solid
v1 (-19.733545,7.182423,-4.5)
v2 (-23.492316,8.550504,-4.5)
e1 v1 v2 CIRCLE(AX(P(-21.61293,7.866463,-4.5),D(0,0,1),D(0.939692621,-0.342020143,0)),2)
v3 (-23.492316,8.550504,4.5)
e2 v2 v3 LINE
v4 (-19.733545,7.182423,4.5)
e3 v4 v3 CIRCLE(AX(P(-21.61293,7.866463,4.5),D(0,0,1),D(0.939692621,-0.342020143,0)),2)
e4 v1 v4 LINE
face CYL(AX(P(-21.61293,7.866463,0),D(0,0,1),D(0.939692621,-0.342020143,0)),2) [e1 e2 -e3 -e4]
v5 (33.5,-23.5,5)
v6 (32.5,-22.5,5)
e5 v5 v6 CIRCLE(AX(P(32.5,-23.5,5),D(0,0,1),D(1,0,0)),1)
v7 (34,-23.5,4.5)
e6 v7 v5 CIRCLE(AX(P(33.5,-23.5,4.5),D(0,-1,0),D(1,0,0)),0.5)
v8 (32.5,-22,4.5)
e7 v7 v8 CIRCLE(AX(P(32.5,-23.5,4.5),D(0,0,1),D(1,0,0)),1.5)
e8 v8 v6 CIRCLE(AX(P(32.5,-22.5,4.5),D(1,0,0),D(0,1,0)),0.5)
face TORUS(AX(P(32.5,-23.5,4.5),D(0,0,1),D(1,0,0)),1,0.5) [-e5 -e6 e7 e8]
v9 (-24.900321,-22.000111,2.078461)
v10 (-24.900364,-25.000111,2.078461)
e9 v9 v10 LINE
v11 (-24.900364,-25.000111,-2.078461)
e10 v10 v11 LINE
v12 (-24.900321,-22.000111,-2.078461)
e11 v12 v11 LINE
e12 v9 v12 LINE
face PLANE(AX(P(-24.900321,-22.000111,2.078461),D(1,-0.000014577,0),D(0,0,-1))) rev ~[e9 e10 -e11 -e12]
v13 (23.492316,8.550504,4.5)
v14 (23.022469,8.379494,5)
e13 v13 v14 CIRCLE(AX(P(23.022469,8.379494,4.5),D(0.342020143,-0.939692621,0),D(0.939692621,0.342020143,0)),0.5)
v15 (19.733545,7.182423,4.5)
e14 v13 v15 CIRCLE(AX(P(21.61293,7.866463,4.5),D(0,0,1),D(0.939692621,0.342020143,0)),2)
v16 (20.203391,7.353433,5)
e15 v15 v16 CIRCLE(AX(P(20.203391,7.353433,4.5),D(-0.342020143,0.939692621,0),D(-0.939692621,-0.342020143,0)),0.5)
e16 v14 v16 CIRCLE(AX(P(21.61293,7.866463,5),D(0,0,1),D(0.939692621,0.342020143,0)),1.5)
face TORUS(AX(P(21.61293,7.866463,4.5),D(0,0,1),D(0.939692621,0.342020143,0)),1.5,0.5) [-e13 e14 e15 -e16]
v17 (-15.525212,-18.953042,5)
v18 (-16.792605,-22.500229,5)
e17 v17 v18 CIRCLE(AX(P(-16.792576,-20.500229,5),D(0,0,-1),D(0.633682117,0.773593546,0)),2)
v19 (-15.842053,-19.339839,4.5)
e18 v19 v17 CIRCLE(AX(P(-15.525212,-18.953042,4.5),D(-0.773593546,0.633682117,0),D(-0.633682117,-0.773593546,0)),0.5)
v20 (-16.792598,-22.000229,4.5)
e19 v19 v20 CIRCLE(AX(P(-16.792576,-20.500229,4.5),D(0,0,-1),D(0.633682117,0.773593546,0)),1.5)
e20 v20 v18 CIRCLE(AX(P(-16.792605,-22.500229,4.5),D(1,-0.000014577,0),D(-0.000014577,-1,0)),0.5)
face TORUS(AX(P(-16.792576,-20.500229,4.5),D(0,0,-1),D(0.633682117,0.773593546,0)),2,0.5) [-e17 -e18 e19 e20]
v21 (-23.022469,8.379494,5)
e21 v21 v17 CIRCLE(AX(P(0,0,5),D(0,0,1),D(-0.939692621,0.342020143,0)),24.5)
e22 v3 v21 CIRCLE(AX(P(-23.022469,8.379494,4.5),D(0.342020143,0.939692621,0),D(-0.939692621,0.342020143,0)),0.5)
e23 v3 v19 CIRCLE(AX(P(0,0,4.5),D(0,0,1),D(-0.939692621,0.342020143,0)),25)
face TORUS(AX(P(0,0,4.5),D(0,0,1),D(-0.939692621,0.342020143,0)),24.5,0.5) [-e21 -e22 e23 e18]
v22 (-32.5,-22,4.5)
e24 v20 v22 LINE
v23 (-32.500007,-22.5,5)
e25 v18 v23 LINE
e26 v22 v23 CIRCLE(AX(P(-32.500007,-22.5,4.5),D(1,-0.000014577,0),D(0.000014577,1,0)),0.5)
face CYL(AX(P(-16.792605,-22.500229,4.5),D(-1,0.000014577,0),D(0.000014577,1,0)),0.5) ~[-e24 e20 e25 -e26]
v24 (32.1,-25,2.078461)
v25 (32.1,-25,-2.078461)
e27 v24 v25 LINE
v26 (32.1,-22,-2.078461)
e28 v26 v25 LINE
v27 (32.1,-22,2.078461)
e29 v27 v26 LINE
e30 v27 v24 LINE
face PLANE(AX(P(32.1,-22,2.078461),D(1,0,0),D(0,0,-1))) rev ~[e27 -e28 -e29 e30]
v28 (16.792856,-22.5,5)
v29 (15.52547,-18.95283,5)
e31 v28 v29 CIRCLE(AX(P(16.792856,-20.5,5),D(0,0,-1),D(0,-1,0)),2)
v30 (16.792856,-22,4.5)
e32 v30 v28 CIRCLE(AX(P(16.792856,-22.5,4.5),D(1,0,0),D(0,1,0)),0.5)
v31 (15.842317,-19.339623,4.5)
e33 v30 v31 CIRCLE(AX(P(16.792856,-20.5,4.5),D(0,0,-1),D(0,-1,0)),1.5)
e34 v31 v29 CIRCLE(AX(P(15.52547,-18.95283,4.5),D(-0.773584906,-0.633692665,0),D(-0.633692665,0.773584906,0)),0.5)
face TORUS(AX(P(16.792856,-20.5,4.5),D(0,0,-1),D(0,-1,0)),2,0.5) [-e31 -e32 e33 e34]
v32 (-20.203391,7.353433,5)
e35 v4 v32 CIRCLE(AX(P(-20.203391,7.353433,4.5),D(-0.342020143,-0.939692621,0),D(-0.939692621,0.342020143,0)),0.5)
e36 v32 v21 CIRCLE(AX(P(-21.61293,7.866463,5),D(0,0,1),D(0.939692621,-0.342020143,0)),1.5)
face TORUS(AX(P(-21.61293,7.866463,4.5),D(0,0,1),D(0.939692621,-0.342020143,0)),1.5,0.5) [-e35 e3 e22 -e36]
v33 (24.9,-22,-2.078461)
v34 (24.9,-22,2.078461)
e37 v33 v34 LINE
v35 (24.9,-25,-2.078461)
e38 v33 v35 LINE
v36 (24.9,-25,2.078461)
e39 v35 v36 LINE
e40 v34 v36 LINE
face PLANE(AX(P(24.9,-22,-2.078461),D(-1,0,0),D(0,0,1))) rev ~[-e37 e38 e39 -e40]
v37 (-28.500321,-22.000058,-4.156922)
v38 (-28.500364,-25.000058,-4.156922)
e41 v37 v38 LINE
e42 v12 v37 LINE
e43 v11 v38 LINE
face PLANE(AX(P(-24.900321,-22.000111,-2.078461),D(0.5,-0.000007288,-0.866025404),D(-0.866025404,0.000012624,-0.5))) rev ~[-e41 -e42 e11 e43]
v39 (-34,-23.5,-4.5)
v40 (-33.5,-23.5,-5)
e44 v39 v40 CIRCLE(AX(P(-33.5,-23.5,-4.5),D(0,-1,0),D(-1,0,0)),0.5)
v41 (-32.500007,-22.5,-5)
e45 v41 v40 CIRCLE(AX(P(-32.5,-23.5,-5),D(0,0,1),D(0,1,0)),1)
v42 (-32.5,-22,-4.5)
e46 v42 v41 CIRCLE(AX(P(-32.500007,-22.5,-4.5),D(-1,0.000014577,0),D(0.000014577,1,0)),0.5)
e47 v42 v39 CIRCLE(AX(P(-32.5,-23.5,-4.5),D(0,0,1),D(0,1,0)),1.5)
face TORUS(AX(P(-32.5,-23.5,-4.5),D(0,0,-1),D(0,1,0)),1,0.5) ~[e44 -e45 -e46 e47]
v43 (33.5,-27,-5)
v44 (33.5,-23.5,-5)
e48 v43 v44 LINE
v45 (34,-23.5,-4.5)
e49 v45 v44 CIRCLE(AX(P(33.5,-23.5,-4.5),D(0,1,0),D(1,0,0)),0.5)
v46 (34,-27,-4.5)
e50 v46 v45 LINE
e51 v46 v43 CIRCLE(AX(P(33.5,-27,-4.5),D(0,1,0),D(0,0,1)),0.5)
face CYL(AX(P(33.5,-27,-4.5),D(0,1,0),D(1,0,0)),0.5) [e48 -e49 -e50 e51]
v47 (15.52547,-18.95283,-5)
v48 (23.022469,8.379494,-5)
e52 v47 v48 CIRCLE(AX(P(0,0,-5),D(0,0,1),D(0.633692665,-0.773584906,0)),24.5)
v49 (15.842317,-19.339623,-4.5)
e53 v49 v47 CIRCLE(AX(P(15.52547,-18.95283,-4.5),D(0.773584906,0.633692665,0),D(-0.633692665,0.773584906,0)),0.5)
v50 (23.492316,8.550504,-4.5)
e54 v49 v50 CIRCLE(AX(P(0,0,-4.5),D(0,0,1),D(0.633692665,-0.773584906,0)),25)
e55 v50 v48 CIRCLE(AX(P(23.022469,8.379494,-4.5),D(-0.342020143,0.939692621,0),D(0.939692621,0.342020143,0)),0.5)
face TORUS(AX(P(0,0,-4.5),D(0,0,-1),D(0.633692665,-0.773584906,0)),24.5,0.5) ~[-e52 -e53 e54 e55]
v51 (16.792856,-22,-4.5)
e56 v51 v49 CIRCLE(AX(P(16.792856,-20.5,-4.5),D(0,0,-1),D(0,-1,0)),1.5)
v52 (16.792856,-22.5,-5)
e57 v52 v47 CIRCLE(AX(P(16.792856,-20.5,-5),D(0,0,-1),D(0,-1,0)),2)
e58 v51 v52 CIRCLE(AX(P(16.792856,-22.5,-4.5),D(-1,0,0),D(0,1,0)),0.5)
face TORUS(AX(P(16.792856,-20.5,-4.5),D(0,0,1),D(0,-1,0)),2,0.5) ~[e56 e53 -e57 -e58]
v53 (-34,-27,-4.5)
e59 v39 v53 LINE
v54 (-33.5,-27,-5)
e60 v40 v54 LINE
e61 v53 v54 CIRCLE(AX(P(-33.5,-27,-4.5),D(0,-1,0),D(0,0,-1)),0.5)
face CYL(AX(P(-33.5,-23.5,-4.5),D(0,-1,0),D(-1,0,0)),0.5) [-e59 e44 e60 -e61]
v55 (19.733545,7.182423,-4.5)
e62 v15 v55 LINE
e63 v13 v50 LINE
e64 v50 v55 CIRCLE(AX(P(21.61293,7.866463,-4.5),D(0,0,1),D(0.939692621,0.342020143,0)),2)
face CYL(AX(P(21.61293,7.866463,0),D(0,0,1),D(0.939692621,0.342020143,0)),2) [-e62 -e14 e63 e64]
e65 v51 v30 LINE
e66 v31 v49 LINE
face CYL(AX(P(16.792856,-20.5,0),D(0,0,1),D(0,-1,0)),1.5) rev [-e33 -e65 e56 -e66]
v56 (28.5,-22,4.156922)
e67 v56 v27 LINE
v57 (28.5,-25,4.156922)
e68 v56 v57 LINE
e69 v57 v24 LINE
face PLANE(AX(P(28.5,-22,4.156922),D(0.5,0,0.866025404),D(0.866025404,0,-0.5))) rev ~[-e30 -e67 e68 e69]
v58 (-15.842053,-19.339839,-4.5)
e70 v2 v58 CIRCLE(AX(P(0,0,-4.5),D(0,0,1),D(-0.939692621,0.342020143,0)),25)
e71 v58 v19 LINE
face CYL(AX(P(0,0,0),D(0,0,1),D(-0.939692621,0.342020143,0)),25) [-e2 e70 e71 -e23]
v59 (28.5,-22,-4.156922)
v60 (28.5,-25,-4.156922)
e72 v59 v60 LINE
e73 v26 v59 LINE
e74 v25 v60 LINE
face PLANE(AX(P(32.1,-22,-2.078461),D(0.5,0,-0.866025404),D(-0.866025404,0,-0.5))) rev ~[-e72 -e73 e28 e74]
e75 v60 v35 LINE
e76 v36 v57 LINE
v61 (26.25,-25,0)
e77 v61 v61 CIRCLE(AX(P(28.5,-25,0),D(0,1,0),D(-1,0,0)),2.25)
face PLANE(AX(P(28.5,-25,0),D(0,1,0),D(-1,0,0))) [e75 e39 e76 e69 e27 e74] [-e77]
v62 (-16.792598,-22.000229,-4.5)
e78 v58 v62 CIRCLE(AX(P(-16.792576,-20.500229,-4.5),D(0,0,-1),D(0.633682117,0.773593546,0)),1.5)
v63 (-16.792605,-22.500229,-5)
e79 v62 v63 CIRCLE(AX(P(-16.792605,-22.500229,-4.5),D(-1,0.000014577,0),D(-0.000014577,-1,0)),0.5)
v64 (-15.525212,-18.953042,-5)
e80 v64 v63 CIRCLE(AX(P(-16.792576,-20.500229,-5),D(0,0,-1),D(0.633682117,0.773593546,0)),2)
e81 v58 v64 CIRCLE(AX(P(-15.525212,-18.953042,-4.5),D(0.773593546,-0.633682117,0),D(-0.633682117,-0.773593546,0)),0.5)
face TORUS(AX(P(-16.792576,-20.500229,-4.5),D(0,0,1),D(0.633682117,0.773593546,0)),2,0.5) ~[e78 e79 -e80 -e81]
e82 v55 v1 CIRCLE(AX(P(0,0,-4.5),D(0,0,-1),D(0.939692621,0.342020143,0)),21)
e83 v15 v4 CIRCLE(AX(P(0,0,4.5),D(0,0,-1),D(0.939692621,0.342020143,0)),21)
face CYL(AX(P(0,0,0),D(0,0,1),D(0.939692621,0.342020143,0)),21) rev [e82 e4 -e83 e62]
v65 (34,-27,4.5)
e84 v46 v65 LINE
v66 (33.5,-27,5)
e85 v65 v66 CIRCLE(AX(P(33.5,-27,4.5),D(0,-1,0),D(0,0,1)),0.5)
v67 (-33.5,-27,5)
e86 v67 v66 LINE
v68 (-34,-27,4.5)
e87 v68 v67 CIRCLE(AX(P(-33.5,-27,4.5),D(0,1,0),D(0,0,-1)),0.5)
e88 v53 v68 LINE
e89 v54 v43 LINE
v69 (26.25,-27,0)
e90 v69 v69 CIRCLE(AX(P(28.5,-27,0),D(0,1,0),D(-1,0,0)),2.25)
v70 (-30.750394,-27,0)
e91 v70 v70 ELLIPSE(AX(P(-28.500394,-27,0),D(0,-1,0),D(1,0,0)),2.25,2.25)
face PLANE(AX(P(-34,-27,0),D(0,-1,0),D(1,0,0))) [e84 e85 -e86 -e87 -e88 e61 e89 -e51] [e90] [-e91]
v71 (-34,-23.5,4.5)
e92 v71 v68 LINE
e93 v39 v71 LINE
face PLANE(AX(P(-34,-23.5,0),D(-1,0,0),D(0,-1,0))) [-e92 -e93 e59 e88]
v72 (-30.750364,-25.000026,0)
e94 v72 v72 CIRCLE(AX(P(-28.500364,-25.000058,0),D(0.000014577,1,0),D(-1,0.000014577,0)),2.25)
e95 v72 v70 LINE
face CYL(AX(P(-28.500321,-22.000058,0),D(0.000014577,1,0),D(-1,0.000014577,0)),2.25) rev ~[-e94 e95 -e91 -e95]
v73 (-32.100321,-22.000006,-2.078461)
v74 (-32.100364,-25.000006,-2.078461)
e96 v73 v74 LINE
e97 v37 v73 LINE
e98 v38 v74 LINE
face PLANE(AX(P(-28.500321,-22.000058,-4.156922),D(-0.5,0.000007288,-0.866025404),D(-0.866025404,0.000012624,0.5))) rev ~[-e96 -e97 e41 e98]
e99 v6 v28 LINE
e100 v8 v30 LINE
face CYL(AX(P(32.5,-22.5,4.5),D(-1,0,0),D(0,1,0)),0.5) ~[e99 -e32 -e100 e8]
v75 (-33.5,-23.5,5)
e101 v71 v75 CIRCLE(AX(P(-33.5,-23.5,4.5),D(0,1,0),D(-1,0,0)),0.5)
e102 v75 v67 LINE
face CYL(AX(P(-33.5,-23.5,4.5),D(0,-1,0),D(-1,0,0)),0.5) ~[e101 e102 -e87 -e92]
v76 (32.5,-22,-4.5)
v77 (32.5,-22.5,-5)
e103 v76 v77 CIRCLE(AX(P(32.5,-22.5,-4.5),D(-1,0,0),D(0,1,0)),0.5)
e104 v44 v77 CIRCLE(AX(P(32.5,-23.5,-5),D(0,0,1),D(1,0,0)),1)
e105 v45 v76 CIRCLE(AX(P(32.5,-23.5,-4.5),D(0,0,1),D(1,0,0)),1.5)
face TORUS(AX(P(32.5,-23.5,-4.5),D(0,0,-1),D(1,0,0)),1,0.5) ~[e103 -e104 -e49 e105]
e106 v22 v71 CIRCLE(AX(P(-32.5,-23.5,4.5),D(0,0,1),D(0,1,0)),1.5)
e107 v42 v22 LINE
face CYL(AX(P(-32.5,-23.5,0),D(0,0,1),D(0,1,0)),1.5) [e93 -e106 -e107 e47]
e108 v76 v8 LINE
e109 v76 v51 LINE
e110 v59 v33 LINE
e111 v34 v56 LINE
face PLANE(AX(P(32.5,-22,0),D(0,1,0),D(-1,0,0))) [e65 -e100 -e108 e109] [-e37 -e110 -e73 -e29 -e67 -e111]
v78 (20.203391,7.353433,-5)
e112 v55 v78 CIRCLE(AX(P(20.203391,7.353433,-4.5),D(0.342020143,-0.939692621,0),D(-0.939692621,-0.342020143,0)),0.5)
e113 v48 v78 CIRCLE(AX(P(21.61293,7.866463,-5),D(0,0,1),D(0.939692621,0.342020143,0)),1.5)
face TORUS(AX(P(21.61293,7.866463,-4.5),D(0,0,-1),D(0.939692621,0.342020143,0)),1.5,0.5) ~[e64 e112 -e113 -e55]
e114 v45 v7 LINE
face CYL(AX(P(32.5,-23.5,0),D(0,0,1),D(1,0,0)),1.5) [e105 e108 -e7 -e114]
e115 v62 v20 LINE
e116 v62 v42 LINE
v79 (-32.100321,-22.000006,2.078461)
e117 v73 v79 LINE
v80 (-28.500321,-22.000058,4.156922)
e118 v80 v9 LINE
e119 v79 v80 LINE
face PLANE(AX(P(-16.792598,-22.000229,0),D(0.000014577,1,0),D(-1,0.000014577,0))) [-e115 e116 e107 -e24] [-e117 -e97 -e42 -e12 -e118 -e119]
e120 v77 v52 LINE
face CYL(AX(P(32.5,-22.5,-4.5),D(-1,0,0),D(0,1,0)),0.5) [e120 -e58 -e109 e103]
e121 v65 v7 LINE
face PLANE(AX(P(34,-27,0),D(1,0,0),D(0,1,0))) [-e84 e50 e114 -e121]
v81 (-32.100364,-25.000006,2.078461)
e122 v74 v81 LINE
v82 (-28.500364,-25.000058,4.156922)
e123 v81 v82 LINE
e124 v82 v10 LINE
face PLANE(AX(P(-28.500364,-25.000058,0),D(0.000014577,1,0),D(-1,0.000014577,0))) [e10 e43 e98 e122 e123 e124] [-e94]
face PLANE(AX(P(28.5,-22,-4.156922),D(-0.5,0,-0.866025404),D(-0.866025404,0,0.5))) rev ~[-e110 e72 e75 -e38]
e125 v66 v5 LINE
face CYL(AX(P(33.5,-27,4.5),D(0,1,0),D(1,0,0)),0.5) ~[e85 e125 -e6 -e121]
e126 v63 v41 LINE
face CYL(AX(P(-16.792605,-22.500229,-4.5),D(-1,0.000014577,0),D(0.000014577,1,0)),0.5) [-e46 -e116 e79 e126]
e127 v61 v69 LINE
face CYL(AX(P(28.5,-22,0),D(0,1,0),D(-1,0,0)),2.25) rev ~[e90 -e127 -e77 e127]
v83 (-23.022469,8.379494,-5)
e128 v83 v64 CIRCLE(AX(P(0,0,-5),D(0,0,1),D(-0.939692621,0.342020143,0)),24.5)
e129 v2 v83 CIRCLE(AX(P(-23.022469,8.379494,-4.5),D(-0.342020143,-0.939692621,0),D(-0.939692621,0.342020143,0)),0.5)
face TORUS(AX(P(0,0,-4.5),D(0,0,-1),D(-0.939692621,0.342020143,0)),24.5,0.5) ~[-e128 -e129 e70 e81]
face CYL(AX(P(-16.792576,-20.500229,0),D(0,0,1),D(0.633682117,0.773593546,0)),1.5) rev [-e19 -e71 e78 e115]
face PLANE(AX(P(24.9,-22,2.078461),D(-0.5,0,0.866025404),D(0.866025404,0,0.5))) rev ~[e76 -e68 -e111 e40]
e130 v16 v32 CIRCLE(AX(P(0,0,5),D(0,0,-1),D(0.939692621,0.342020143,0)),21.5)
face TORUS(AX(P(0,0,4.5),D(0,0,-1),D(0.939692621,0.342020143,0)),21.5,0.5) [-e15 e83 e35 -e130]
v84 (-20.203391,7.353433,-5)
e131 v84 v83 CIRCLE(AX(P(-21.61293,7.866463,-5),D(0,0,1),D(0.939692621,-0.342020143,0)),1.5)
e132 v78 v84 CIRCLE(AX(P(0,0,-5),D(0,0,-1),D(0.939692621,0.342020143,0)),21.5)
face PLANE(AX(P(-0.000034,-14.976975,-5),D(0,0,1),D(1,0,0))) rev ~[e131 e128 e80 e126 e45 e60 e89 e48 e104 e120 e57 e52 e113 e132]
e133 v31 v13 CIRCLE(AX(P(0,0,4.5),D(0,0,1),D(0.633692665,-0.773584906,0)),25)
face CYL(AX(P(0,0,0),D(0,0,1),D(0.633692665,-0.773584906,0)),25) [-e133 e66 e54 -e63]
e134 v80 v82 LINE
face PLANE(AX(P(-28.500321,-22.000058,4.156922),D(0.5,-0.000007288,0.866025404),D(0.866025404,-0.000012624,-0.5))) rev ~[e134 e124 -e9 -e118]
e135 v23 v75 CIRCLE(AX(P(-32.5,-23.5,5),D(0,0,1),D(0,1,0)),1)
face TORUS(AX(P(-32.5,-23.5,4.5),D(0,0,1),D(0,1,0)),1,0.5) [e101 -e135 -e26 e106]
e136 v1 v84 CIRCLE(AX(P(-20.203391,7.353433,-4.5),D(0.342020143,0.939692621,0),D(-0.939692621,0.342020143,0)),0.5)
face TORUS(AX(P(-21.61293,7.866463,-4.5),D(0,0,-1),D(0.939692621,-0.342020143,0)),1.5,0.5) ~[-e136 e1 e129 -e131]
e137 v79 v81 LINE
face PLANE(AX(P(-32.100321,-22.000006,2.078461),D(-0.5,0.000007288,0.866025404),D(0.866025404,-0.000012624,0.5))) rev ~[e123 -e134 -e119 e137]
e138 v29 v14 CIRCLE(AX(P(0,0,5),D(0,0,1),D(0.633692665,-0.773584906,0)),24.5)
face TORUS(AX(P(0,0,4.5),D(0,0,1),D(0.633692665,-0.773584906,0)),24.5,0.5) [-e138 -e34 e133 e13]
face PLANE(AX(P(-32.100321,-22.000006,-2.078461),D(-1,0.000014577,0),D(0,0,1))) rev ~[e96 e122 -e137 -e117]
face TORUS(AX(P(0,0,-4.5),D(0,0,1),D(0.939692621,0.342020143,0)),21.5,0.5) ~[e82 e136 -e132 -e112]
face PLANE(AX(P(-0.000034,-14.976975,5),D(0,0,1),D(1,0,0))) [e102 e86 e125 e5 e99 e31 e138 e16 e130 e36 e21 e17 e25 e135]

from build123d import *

# Parameters (mm, degrees)
F1_DEPTH  = 5
F2_R      = 2.25
F3_DEPTH  = 25
F5_DEPTH  = 3
F6_R      = 0.5
F7_R      = 0.5
F8_R      = 2.25
F9_DEPTH  = 25
F11_DEPTH = 3


# Not quite as in the source:
# - a feature names something its author has since deleted; it is built from what else it names


with BuildPart() as f1:
    # F0 (on Top) → F1 (new body, symmetric)
    with BuildSketch(Plane.XY):
        with BuildLine():
            Line((23.4923155196, 8.5505035831), (19.7335450365, 7.1824230098))
            ThreePointArc((19.7335450365, 7.1824230098), (0, -21), (-19.7335450365, 7.1824230098))
            Line((-19.7335450365, 7.1824230098), (-23.4923155196, 8.5505035831))
            ThreePointArc((-23.4923155196, 8.5505035831), (-24.1094573309, -6.6131737621), (-15.8420529306, -19.3398386483))
            ThreePointArc((-15.8420529306, -19.3398386483), (-15.380031471, -21.0049245713), (-16.792597972, -22.0002289671))
            Line((-16.792597972, -22.0002289671), (-32.5, -22))
            ThreePointArc((-32.5, -22), (-33.5606601718, -22.4393398282), (-34, -23.5))
            Line((-34, -23.5), (-34, -27))
            Line((-34, -27), (34, -27))
            Line((34, -27), (34, -23.5))
            ThreePointArc((34, -23.5), (33.5606601718, -22.4393398282), (32.5, -22))
            Line((32.5, -22), (16.7928556237, -22))
            ThreePointArc((16.7928556237, -22), (15.3803107505, -21.0046949387), (15.8423166262, -19.3396226415))
            ThreePointArc((15.8423166262, -19.3396226415), (24.1095024154, -6.6130093967), (23.4923155196, 8.5505035831))
        make_face()
        with BuildLine():
            Line((-23.4923155196, 8.5505035831), (-19.7335450365, 7.1824230098))
            ThreePointArc((-19.7335450365, 7.1824230098), (-20.9288899914, 9.7458485381), (-23.4923155196, 8.5505035831))
        make_face()
        with BuildLine():
            ThreePointArc((23.4923155196, 8.5505035831), (20.9288899914, 9.7458485381), (19.7335450365, 7.1824230098))
            Line((19.7335450365, 7.1824230098), (23.4923155196, 8.5505035831))
        make_face()
    extrude(amount=F1_DEPTH, both=True)

    # F2 (on face) → F3 (cut)
    with BuildSketch(Plane(origin=(0, -22, 0), x_dir=(-1, 0, 0), z_dir=(0, 1, 0))):
        with Locations((-28.5, 0)):
            Circle(F2_R)
    extrude(amount=-F3_DEPTH, mode=Mode.SUBTRACT)

    # F4 (on face) → F5 (cut)
    with BuildSketch(Plane(origin=(0, -22, 0), x_dir=(-1, 0, 0), z_dir=(0, 1, 0))):
        Polygon((-32.1, 2.0784609691), (-32.1, -2.0784609691), (-28.5, -4.1569219382), (-24.9, -2.0784609691), (-24.9, 2.0784609691), (-28.5, 4.1569219382), align=None)
    extrude(amount=-F5_DEPTH, mode=Mode.SUBTRACT)

    # F6
    f6_edges = [f1.edges().sort_by_distance(p)[0] for p in [
        (0, -21, 5),
        (20.92889, 9.745849, 5),
        (24.646428, -22, 5),
        (33.56066, -22.43934, 5),
        (34, -25.25, 5),
        (-20.92889, 9.745849, 5),
        (-33.56066, -22.43934, 5),
        (-34, -25.25, 5),
    ]]
    fillet(f6_edges, radius=F6_R)

    # F7
    f7_edges = [f1.edges().sort_by_distance(p)[0] for p in [
        (0, -21, -5),
        (20.92889, 9.745849, -5),
        (24.646428, -22, -5),
        (33.56066, -22.43934, -5),
        (34, -25.25, -5),
        (-20.92889, 9.745849, -5),
        (-33.56066, -22.43934, -5),
        (-34, -25.25, -5),
    ]]
    fillet(f7_edges, radius=F7_R)

    # F8 (on face) → F9 (cut)
    with BuildSketch(Plane(origin=(-0.0003207013, -22.0004737484, 0), x_dir=(-0.9999999999, 1.4577e-05, 0), z_dir=(1.4577e-05, 0.9999999999, 0))):
        with Locations((28.5, 0)):
            Circle(F8_R)
    extrude(amount=-F9_DEPTH, mode=Mode.SUBTRACT)

    # F10 (on face) → F11 (cut)
    with BuildSketch(Plane(origin=(-0.0003207013, -22.0004737484, 0), x_dir=(-0.9999999999, 1.4577e-05, 0), z_dir=(1.4577e-05, 0.9999999999, 0))):
        Polygon((32.1, -2.0784609691), (32.1, 2.0784609691), (28.5, 4.1569219382), (24.9, 2.0784609691), (24.9, -2.0784609691), (28.5, -4.1569219382), align=None)
    extrude(amount=-F11_DEPTH, mode=Mode.SUBTRACT)


solid = f1.part
